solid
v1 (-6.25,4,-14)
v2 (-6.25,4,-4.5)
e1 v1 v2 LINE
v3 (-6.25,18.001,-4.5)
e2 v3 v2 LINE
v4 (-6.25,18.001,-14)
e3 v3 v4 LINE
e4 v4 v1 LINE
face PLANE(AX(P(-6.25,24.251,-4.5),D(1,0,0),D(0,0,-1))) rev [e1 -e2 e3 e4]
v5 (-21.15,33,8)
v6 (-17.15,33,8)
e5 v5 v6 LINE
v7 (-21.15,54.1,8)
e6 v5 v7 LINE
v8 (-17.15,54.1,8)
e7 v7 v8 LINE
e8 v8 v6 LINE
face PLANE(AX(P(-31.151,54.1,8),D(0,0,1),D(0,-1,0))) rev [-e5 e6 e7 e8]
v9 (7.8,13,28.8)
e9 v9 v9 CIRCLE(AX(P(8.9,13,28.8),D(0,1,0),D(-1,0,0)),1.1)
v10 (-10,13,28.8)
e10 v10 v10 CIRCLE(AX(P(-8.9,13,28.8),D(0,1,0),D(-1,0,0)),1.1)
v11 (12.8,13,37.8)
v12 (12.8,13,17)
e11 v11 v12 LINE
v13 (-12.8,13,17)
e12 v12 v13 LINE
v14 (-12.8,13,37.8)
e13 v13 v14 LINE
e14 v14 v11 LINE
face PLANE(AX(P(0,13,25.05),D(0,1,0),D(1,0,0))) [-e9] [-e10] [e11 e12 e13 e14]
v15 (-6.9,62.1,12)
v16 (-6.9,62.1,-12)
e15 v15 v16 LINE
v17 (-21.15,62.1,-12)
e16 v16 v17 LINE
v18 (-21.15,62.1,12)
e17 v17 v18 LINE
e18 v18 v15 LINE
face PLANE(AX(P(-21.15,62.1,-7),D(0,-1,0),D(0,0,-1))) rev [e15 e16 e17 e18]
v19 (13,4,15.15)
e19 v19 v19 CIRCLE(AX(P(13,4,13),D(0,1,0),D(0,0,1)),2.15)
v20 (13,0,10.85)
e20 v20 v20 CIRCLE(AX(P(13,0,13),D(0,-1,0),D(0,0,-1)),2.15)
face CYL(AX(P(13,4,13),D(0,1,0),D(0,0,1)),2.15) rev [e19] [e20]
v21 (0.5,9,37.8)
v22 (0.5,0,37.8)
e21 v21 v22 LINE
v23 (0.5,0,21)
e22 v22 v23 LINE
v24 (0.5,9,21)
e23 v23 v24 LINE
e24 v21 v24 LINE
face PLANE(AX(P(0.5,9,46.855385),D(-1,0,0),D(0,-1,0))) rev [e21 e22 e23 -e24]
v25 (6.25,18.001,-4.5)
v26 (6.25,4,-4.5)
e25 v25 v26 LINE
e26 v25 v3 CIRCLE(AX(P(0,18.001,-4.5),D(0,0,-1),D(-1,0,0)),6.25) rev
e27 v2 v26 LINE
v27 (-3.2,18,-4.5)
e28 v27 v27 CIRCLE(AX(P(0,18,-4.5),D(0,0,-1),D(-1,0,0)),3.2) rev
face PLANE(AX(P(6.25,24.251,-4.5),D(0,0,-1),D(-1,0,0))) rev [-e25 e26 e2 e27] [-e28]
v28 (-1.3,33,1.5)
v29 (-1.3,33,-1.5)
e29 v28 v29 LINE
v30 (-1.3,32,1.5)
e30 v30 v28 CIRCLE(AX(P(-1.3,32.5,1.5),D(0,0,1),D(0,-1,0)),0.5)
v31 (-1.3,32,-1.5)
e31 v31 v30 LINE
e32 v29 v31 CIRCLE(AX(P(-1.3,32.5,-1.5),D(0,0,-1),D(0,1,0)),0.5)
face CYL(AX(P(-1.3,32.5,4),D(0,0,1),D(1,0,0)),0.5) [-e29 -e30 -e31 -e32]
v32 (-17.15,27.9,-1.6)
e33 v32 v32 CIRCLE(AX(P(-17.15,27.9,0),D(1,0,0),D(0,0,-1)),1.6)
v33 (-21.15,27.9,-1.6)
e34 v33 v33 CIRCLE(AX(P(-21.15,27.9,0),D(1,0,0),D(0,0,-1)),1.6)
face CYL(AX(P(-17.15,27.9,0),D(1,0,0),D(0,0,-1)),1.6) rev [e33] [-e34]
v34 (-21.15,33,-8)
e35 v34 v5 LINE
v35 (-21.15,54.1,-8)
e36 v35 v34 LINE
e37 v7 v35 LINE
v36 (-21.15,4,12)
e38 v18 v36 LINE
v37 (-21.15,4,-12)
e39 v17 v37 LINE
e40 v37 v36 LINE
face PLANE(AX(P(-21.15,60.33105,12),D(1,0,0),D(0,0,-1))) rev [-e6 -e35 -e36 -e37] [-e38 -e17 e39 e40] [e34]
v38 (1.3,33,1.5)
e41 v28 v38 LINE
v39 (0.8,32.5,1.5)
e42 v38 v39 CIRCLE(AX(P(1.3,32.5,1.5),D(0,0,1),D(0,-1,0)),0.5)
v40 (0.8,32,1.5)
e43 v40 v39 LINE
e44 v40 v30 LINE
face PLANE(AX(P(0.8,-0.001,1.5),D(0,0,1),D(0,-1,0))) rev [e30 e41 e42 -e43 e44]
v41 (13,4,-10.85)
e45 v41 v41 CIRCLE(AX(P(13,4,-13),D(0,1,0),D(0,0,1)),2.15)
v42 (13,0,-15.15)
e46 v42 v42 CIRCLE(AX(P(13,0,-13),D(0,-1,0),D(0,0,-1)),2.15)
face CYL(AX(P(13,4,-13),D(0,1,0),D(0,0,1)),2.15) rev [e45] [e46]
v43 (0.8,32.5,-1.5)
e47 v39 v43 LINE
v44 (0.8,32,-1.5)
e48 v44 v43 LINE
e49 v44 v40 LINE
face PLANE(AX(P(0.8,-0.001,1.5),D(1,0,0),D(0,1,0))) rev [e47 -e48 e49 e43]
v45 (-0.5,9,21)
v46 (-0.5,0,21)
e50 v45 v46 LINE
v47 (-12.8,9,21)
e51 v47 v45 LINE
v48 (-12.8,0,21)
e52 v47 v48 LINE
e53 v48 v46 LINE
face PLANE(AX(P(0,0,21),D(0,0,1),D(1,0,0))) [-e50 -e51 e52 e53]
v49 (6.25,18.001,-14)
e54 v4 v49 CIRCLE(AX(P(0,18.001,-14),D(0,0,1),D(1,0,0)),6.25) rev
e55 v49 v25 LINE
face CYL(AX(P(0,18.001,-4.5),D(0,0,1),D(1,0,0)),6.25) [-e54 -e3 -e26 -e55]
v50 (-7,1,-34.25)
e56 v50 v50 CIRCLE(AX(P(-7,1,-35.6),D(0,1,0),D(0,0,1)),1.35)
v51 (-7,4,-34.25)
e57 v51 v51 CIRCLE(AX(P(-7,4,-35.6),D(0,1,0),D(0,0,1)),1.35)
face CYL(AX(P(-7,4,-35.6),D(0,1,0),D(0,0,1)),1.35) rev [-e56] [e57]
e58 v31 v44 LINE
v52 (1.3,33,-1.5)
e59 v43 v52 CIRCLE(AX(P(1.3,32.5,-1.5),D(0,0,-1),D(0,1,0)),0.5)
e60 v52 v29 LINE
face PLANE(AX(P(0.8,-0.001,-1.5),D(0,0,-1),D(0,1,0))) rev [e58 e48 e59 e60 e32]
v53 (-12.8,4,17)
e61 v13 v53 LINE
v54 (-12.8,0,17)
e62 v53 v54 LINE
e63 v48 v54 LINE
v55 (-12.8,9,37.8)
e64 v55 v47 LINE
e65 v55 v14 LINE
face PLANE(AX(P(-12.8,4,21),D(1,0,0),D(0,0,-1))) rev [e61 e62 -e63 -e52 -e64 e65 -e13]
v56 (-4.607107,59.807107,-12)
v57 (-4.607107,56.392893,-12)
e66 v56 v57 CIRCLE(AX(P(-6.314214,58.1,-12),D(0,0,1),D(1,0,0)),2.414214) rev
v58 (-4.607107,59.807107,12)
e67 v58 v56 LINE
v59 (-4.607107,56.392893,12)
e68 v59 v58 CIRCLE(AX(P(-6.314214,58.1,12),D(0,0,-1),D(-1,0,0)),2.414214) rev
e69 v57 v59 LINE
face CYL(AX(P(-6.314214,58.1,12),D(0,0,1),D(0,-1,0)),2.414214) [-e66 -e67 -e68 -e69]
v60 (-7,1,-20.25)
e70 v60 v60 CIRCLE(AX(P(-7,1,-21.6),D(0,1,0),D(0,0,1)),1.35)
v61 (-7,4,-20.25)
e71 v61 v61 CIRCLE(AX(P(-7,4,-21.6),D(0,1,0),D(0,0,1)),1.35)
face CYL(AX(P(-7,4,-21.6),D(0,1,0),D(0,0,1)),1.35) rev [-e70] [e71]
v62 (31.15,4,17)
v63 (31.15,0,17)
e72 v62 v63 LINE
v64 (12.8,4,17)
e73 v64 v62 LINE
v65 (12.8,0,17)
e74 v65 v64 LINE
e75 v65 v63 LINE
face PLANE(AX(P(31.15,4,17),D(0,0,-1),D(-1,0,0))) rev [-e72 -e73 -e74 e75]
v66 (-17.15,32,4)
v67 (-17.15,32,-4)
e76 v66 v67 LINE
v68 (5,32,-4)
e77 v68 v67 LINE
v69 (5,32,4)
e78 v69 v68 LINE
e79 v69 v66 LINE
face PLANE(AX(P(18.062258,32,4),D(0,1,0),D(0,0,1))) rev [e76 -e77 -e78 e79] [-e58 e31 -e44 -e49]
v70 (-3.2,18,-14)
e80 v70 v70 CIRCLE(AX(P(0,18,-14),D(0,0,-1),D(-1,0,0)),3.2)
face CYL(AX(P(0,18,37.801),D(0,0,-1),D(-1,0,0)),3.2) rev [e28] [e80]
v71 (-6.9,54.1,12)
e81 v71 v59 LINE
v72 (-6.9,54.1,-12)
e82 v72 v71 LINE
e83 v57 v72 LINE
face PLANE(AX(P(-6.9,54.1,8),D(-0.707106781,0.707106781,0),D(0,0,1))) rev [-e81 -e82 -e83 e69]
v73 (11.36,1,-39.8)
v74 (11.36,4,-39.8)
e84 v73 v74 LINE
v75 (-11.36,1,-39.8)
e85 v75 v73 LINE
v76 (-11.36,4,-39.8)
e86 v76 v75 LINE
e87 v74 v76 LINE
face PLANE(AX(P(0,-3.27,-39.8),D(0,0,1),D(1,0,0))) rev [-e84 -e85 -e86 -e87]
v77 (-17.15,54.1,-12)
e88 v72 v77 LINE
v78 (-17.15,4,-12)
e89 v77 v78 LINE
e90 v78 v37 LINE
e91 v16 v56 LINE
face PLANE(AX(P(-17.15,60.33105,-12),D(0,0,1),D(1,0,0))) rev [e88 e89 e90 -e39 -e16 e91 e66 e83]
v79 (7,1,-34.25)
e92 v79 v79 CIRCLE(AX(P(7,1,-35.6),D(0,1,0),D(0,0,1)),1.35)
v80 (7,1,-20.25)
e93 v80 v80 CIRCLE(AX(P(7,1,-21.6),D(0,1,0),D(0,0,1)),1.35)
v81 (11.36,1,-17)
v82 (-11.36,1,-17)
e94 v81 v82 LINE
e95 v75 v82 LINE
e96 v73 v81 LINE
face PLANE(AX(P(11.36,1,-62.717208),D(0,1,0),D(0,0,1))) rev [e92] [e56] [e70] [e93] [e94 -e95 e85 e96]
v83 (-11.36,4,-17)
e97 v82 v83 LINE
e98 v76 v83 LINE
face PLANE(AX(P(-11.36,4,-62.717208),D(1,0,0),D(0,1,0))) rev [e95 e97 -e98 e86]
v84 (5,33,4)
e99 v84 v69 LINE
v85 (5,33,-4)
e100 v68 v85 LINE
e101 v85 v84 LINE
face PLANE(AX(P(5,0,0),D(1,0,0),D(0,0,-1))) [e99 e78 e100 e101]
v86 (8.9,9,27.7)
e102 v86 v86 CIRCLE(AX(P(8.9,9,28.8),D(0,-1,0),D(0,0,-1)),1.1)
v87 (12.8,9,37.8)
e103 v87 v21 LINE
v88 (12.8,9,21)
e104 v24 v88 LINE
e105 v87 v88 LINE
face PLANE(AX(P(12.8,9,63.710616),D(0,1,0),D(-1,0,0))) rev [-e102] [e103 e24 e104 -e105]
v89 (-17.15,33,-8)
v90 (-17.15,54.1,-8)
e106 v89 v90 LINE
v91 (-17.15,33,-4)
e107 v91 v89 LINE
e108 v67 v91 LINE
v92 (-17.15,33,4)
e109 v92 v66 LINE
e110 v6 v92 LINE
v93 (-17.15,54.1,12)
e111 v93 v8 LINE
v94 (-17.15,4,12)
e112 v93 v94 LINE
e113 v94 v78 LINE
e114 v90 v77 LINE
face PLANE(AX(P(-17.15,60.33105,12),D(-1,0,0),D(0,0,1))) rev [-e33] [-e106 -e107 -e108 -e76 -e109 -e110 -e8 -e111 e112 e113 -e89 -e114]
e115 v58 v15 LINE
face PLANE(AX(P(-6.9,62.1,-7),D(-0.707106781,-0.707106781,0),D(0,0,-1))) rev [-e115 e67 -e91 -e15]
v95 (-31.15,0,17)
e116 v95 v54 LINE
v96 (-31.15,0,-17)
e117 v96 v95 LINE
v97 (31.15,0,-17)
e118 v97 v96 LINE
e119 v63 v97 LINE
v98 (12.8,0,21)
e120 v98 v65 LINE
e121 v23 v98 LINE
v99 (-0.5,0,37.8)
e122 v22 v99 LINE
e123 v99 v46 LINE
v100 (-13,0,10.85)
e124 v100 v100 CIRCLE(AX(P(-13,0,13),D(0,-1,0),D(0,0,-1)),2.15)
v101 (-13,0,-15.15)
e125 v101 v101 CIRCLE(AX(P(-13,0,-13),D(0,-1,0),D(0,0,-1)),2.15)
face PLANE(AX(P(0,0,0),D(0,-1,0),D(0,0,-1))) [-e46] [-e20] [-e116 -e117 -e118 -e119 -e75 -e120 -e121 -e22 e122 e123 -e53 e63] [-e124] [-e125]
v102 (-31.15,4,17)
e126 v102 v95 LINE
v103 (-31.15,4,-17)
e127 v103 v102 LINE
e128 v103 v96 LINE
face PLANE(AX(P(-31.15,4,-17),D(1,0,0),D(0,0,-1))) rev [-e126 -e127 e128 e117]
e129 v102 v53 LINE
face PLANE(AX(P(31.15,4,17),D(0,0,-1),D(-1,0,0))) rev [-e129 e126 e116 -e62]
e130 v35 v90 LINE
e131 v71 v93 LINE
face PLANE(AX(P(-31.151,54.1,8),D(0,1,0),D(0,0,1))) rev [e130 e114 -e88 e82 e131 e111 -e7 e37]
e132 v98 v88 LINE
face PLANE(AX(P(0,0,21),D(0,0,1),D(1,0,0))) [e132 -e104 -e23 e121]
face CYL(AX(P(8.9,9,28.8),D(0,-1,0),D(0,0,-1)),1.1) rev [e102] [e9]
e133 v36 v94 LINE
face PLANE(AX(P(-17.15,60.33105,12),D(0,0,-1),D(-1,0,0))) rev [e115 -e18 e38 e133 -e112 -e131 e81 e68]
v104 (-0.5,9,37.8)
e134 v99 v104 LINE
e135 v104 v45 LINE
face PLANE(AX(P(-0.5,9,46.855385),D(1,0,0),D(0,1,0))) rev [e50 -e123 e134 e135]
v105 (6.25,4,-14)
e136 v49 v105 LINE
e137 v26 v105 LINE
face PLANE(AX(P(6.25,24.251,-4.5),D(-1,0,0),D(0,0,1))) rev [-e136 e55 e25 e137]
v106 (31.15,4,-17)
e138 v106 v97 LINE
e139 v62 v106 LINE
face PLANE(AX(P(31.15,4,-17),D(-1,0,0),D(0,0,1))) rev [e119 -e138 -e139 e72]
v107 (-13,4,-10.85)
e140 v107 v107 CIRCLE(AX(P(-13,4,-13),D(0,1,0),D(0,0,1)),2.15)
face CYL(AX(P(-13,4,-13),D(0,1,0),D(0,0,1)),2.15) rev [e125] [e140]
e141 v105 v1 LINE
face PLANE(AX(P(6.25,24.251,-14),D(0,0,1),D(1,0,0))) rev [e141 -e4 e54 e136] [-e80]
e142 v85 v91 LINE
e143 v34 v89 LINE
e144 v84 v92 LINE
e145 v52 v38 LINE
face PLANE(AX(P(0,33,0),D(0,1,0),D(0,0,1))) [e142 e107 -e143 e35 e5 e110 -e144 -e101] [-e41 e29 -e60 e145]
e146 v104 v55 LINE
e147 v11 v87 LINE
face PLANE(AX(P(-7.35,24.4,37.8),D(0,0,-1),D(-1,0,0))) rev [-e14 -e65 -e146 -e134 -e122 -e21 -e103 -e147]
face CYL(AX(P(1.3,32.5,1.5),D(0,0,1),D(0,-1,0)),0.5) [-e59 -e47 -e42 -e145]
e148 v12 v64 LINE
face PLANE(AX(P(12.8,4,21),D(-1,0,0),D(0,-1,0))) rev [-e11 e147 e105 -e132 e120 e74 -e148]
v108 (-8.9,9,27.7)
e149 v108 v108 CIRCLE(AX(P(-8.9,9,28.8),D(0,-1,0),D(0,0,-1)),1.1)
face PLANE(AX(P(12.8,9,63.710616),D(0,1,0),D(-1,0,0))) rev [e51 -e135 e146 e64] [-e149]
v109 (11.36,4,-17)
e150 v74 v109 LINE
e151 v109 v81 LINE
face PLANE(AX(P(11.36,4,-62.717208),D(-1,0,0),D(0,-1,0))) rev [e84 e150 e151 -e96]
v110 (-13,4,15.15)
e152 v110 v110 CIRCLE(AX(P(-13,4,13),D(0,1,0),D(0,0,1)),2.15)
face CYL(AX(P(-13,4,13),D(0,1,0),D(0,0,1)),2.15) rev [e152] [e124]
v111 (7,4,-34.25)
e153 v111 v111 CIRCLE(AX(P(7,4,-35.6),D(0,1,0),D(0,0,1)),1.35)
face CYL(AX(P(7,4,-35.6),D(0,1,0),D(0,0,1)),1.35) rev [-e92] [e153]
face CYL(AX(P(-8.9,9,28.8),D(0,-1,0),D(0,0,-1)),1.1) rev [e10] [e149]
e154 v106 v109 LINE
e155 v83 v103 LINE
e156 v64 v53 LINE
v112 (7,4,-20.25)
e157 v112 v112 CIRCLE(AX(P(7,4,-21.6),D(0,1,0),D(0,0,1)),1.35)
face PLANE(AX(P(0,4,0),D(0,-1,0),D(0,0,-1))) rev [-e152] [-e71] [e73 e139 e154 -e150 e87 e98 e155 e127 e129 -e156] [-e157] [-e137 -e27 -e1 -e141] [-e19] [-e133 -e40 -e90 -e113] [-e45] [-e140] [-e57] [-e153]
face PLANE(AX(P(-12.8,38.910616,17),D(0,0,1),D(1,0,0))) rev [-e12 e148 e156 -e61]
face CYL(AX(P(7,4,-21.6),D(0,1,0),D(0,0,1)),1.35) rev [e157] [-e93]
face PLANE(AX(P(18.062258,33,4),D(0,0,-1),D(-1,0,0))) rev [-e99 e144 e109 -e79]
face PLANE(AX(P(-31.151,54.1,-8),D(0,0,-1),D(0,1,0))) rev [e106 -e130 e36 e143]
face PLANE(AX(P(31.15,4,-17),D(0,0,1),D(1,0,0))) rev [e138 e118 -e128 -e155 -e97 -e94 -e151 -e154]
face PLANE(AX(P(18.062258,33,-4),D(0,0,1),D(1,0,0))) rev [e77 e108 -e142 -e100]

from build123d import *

# Parameters (mm, degrees)
SKETCH_1_W                 = 62.3
SKETCH_1_H                 = 34
EXTRUDE_346_DEPTH          = 4
HOLE_WIZARD_M4_1_D         = 4.3
PATTERN_SKETCH_1_OUTLINE_R = 2.15
PATTERN_SKETCH_1_DEPTH     = 4
SKETCH_6_W                 = 22.72
SKETCH_6_H                 = 3
EXTRUDE_2_DEPTH            = 22.8
HOLE_WIZARD_M2_5_1_D       = 2.7
PATTERN_START              = 1
PATTERN_SKETCH_2_OUTLINE_R = 1.35
PATTERN_SKETCH_2_DEPTH     = 3
SKETCH_11_W                = 25.6
SKETCH_11_H                = 4
EXTRUDE_5_DEPTH            = 4
SKETCH_12_W                = 25.6
SKETCH_12_H                = 4
EXTRUDE_6_DEPTH            = 9
SKETCH_13_W                = 25.6
SKETCH_13_H                = 4
EXTRUDE_7_DEPTH            = 16.8
HOLE_WIZARD_M2_1_D         = 2.2
EXTRUDE_START              = -14
EXTRUDE_8_OUTLINE_W        = 12.5
EXTRUDE_8_OUTLINE_H        = 20.251
EXTRUDE_8_OUTLINE_R        = 0.25
EXTRUDE_8_DEPTH            = 9.5
CUT_EXTRUDE_1_REACH        = 67.128
SKETCH_18_R                = 3.2
FILLET_1_RADIUS            = 6.25
FILLET_1_LENGTH            = 9.5
SKETCH_19_W                = 4
SKETCH_19_H                = 24
EXTRUDE_10_DEPTH           = 29
SKETCH_20_W                = 8
SKETCH_20_H                = 1
EXTRUDE_11_DEPTH           = 22.15
CUT_EXTRUDE_3_REACH        = 62.36
SKETCH_22_W                = 1.6
SKETCH_22_H                = 3
FILLET_2_RADIUS            = 0.5
FILLET_2_LENGTH            = 3
FILLET_3_R                 = 0.5
SKETCH_23_W                = 1
SKETCH_23_H                = 9
EXTRUDE_12_DEPTH           = 16.8
HOLE_WIZARD_M3_1_D         = 3.2
EXTRUDE_START_2            = 29
SKETCH_19_2_W              = 4
SKETCH_19_2_H              = 24
EXTRUDE_17_DEPTH           = 29.1
CUT_EXTRUDE_4_REACH        = 90.167
SKETCH_29_W                = 16
SKETCH_29_H                = 21.1
SKETCH_30_W                = 24
SKETCH_30_H                = 8
EXTRUDE_18_DEPTH           = 13.25
CHAMFER_1_SIZE             = 3
FILLET_4_R                 = 2.414214


# Read off the part's stored shape, not the designer's step: 草图阵列1, 草图阵列2, 凸台-拉伸8
with BuildPart() as part:
    # 草图1 → Extrude 346 (new body)
    with BuildSketch(Plane(origin=(0, 0, 0), x_dir=(1, 0, 0), z_dir=(0, 1, 0))):
        Rectangle(SKETCH_1_W, SKETCH_1_H)
    extrude(amount=EXTRUDE_346_DEPTH)

    # M4 间隙孔1 (through all)
    with Locations(Plane(origin=(0, 4, 0), x_dir=(1, 0, 0), z_dir=(0, 1, 0))):
        with Locations((13, -13)):
            Hole(HOLE_WIZARD_M4_1_D / 2)

    # 草图阵列1 outline → 草图阵列1 (cut)
    with BuildSketch(Plane(origin=(0, 0, 0), x_dir=(1, 0, 0), z_dir=(0, 1, 0))):
        with Locations((-13, 13)):
            Circle(PATTERN_SKETCH_1_OUTLINE_R)
        with Locations((-13, -13)):
            Circle(PATTERN_SKETCH_1_OUTLINE_R)
        with Locations((13, 13)):
            Circle(PATTERN_SKETCH_1_OUTLINE_R)
    extrude(amount=PATTERN_SKETCH_1_DEPTH, mode=Mode.SUBTRACT)

    # 草图6 → 凸台-拉伸2 (add)
    with BuildSketch(Plane(origin=(0, 0, -17), x_dir=(-1, 0, 0), z_dir=(0, 0, -1))):
        with Locations((0, 2.5)):
            Rectangle(SKETCH_6_W, SKETCH_6_H)
    extrude(amount=EXTRUDE_2_DEPTH)

    # M2.5 间隙孔1 (through all)
    with Locations(Plane(origin=(0, 4, 0), x_dir=(1, 0, 0), z_dir=(0, 1, 0))):
        with Locations((-7, 35.6)):
            Hole(HOLE_WIZARD_M2_5_1_D / 2)

    # 草图阵列2 outline → 草图阵列2 (cut)
    with BuildSketch(Plane(origin=(0, 0, 0), x_dir=(1, 0, 0), z_dir=(0, 1, 0)).offset(PATTERN_START)):
        with Locations((7, 21.6)):
            Circle(PATTERN_SKETCH_2_OUTLINE_R)
        with Locations((7, 35.6)):
            Circle(PATTERN_SKETCH_2_OUTLINE_R)
        with Locations((-7, 21.6)):
            Circle(PATTERN_SKETCH_2_OUTLINE_R)
    extrude(amount=PATTERN_SKETCH_2_DEPTH, mode=Mode.SUBTRACT)

    # 草图11 → 凸台-拉伸5 (add)
    with BuildSketch(Plane.XY.offset(17)):
        with Locations((0, 2)):
            Rectangle(SKETCH_11_W, SKETCH_11_H)
    extrude(amount=EXTRUDE_5_DEPTH)

    # 草图12 → 凸台-拉伸6 (add)
    with BuildSketch(Plane(origin=(0, 4, 0), x_dir=(1, 0, 0), z_dir=(0, 1, 0))):
        with Locations((0, -19)):
            Rectangle(SKETCH_12_W, SKETCH_12_H)
    extrude(amount=EXTRUDE_6_DEPTH)

    # 草图13 → 凸台-拉伸7 (add)
    with BuildSketch(Plane.XY.offset(21)):
        with Locations((0, 11)):
            Rectangle(SKETCH_13_W, SKETCH_13_H)
    extrude(amount=EXTRUDE_7_DEPTH)

    # M2 间隙孔1 (through all)
    with Locations(Plane(origin=(0, 9, 0), x_dir=(-1, 0, 0), z_dir=(0, -1, 0))):
        with Locations((8.9, -28.8), (-8.9, -28.8)):
            Hole(HOLE_WIZARD_M2_1_D / 2)

    # 凸台-拉伸8 outline → 凸台-拉伸8 (add)
    with BuildSketch(Plane.XY.offset(EXTRUDE_START)):
        with Locations((0, 14.1255)):
            Rectangle(EXTRUDE_8_OUTLINE_W, EXTRUDE_8_OUTLINE_H)
        with Locations((0, 18)):
            Circle(EXTRUDE_8_OUTLINE_R, mode=Mode.SUBTRACT)
    extrude(amount=EXTRUDE_8_DEPTH)

    # 草图18 → 切除-拉伸1 (cut, up to next)
    with BuildSketch(Plane(origin=(0, 0, -14), x_dir=(-1, 0, 0), z_dir=(0, 0, -1)), mode=Mode.PRIVATE) as cut_extrude_1_sk1:
        with Locations((0, 18)):
            Circle(SKETCH_18_R)
    cut_extrude_1_tool1 = extrude(cut_extrude_1_sk1.sketch, amount=-CUT_EXTRUDE_1_REACH, mode=Mode.PRIVATE) & part.part
    add(cut_extrude_1_tool1.solids().sort_by_distance((0, 18, -14))[0], mode=Mode.SUBTRACT)

    # 圆角1: full round fillet: the end face becomes a half cylinder, R = half its width
    fillet_1_face = Plane((0, 24.251, -9.25), x_dir=(0, 0, -1), z_dir=(0, 1, 0))  # on the end face: x along it, z out of the body
    fillet_1_slab = fillet_1_face.offset(-FILLET_1_RADIUS / 2) * Box(FILLET_1_LENGTH, 2 * FILLET_1_RADIUS, FILLET_1_RADIUS, mode=Mode.PRIVATE)  # the body's end, R deep
    fillet_1_round = Plane((0, 18.001, -9.25), x_dir=(0, 1, 0), z_dir=(0, 0, -1)) * Cylinder(FILLET_1_RADIUS, FILLET_1_LENGTH, mode=Mode.PRIVATE)  # its axis R under the face
    add(fillet_1_slab - fillet_1_round, mode=Mode.SUBTRACT)

    # 草图19 → 凸台-拉伸10 (add)
    with BuildSketch(Plane(origin=(0, 4, 0), x_dir=(1, 0, 0), z_dir=(0, 1, 0))):
        with Locations((-19.15, 0)):
            Rectangle(SKETCH_19_W, SKETCH_19_H)
    extrude(amount=EXTRUDE_10_DEPTH)

    # 草图20 → 凸台-拉伸11 (add)
    with BuildSketch(Plane(origin=(-17.15, 0, 0), x_dir=(0, 0, -1), z_dir=(1, 0, 0))):
        with Locations((0, 32.5)):
            Rectangle(SKETCH_20_W, SKETCH_20_H)
    extrude(amount=EXTRUDE_11_DEPTH)

    # 草图22 → 切除-拉伸3 (cut, up to next)
    with BuildSketch(Plane(origin=(0, 33, 0), x_dir=(1, 0, 0), z_dir=(0, 1, 0)), mode=Mode.PRIVATE) as cut_extrude_3_sk1:
        Rectangle(SKETCH_22_W, SKETCH_22_H)
    cut_extrude_3_tool1 = extrude(cut_extrude_3_sk1.sketch, amount=-CUT_EXTRUDE_3_REACH, mode=Mode.PRIVATE) & part.part
    add(cut_extrude_3_tool1.solids().sort_by_distance((0, 33, 0))[0], mode=Mode.SUBTRACT)

    # 圆角2: full round fillet: the end face becomes a half cylinder, R = half its width
    fillet_2_face = Plane((-0.8, 32.5, 0), x_dir=(0, 0, -1), z_dir=(1, 0, 0))  # on the end face: x along it, z out of the body
    fillet_2_slab = fillet_2_face.offset(-FILLET_2_RADIUS / 2) * Box(FILLET_2_LENGTH, 2 * FILLET_2_RADIUS, FILLET_2_RADIUS, mode=Mode.PRIVATE)  # the body's end, R deep
    fillet_2_round = Plane((-1.3, 32.5, 0), x_dir=(1, 0, 0), z_dir=(0, 0, -1)) * Cylinder(FILLET_2_RADIUS, FILLET_2_LENGTH, mode=Mode.PRIVATE)  # its axis R under the face
    add(fillet_2_slab - fillet_2_round, mode=Mode.SUBTRACT)

    # 圆角3
    fillet_3_edges = [part.edges().sort_by_distance(p)[0] for p in [
        (0.8, 33, 0),
    ]]
    fillet(fillet_3_edges, radius=FILLET_3_R)

    # 草图23 → 凸台-拉伸12 (add)
    with BuildSketch(Plane.XY.offset(21)):
        with Locations((0, 4.5)):
            Rectangle(SKETCH_23_W, SKETCH_23_H)
    extrude(amount=EXTRUDE_12_DEPTH)

    # M3 间隙孔1 (through all)
    with Locations(Plane(origin=(-17.15, 0, 0), x_dir=(0, 0, -1), z_dir=(1, 0, 0))):
        with Locations((0, 27.9)):
            Hole(HOLE_WIZARD_M3_1_D / 2)

    # 草图19<2> → 凸台-拉伸17 (add)
    with BuildSketch(Plane(origin=(0, 4, 0), x_dir=(1, 0, 0), z_dir=(0, 1, 0)).offset(EXTRUDE_START_2)):
        with Locations((-19.15, 0)):
            Rectangle(SKETCH_19_2_W, SKETCH_19_2_H)
    extrude(amount=EXTRUDE_17_DEPTH)

    # 草图29 → 切除-拉伸4 (cut, up to next)
    with BuildSketch(Plane(origin=(-17.15, 0, 0), x_dir=(0, 0, -1), z_dir=(1, 0, 0)), mode=Mode.PRIVATE) as cut_extrude_4_sk1:
        with Locations((0, 43.55)):
            Rectangle(SKETCH_29_W, SKETCH_29_H)
    cut_extrude_4_tool1 = extrude(cut_extrude_4_sk1.sketch, amount=-CUT_EXTRUDE_4_REACH, mode=Mode.PRIVATE) & part.part
    add(cut_extrude_4_tool1.solids().sort_by_distance((-17.15, 43.55, 0))[0], mode=Mode.SUBTRACT)

    # 草图30 → 凸台-拉伸18 (add)
    with BuildSketch(Plane(origin=(-17.15, 0, 0), x_dir=(0, 0, -1), z_dir=(1, 0, 0))):
        with Locations((0, 58.1)):
            Rectangle(SKETCH_30_W, SKETCH_30_H)
    extrude(amount=EXTRUDE_18_DEPTH)

    # 倒角1
    chamfer_1_edges = [part.edges().sort_by_distance(p)[0] for p in [
        (-3.9, 62.1, 0),
        (-3.9, 54.1, 0),
    ]]
    chamfer(chamfer_1_edges, length=CHAMFER_1_SIZE)

    # 圆角4
    fillet_4_edges = [part.edges().sort_by_distance(p)[0] for p in [
        (-3.9, 57.1, 0),
        (-3.9, 59.1, 0),
    ]]
    fillet(fillet_4_edges, radius=FILLET_4_R - 0.0001)  # a hair under: the kernel refuses the full size


solid = part.part
